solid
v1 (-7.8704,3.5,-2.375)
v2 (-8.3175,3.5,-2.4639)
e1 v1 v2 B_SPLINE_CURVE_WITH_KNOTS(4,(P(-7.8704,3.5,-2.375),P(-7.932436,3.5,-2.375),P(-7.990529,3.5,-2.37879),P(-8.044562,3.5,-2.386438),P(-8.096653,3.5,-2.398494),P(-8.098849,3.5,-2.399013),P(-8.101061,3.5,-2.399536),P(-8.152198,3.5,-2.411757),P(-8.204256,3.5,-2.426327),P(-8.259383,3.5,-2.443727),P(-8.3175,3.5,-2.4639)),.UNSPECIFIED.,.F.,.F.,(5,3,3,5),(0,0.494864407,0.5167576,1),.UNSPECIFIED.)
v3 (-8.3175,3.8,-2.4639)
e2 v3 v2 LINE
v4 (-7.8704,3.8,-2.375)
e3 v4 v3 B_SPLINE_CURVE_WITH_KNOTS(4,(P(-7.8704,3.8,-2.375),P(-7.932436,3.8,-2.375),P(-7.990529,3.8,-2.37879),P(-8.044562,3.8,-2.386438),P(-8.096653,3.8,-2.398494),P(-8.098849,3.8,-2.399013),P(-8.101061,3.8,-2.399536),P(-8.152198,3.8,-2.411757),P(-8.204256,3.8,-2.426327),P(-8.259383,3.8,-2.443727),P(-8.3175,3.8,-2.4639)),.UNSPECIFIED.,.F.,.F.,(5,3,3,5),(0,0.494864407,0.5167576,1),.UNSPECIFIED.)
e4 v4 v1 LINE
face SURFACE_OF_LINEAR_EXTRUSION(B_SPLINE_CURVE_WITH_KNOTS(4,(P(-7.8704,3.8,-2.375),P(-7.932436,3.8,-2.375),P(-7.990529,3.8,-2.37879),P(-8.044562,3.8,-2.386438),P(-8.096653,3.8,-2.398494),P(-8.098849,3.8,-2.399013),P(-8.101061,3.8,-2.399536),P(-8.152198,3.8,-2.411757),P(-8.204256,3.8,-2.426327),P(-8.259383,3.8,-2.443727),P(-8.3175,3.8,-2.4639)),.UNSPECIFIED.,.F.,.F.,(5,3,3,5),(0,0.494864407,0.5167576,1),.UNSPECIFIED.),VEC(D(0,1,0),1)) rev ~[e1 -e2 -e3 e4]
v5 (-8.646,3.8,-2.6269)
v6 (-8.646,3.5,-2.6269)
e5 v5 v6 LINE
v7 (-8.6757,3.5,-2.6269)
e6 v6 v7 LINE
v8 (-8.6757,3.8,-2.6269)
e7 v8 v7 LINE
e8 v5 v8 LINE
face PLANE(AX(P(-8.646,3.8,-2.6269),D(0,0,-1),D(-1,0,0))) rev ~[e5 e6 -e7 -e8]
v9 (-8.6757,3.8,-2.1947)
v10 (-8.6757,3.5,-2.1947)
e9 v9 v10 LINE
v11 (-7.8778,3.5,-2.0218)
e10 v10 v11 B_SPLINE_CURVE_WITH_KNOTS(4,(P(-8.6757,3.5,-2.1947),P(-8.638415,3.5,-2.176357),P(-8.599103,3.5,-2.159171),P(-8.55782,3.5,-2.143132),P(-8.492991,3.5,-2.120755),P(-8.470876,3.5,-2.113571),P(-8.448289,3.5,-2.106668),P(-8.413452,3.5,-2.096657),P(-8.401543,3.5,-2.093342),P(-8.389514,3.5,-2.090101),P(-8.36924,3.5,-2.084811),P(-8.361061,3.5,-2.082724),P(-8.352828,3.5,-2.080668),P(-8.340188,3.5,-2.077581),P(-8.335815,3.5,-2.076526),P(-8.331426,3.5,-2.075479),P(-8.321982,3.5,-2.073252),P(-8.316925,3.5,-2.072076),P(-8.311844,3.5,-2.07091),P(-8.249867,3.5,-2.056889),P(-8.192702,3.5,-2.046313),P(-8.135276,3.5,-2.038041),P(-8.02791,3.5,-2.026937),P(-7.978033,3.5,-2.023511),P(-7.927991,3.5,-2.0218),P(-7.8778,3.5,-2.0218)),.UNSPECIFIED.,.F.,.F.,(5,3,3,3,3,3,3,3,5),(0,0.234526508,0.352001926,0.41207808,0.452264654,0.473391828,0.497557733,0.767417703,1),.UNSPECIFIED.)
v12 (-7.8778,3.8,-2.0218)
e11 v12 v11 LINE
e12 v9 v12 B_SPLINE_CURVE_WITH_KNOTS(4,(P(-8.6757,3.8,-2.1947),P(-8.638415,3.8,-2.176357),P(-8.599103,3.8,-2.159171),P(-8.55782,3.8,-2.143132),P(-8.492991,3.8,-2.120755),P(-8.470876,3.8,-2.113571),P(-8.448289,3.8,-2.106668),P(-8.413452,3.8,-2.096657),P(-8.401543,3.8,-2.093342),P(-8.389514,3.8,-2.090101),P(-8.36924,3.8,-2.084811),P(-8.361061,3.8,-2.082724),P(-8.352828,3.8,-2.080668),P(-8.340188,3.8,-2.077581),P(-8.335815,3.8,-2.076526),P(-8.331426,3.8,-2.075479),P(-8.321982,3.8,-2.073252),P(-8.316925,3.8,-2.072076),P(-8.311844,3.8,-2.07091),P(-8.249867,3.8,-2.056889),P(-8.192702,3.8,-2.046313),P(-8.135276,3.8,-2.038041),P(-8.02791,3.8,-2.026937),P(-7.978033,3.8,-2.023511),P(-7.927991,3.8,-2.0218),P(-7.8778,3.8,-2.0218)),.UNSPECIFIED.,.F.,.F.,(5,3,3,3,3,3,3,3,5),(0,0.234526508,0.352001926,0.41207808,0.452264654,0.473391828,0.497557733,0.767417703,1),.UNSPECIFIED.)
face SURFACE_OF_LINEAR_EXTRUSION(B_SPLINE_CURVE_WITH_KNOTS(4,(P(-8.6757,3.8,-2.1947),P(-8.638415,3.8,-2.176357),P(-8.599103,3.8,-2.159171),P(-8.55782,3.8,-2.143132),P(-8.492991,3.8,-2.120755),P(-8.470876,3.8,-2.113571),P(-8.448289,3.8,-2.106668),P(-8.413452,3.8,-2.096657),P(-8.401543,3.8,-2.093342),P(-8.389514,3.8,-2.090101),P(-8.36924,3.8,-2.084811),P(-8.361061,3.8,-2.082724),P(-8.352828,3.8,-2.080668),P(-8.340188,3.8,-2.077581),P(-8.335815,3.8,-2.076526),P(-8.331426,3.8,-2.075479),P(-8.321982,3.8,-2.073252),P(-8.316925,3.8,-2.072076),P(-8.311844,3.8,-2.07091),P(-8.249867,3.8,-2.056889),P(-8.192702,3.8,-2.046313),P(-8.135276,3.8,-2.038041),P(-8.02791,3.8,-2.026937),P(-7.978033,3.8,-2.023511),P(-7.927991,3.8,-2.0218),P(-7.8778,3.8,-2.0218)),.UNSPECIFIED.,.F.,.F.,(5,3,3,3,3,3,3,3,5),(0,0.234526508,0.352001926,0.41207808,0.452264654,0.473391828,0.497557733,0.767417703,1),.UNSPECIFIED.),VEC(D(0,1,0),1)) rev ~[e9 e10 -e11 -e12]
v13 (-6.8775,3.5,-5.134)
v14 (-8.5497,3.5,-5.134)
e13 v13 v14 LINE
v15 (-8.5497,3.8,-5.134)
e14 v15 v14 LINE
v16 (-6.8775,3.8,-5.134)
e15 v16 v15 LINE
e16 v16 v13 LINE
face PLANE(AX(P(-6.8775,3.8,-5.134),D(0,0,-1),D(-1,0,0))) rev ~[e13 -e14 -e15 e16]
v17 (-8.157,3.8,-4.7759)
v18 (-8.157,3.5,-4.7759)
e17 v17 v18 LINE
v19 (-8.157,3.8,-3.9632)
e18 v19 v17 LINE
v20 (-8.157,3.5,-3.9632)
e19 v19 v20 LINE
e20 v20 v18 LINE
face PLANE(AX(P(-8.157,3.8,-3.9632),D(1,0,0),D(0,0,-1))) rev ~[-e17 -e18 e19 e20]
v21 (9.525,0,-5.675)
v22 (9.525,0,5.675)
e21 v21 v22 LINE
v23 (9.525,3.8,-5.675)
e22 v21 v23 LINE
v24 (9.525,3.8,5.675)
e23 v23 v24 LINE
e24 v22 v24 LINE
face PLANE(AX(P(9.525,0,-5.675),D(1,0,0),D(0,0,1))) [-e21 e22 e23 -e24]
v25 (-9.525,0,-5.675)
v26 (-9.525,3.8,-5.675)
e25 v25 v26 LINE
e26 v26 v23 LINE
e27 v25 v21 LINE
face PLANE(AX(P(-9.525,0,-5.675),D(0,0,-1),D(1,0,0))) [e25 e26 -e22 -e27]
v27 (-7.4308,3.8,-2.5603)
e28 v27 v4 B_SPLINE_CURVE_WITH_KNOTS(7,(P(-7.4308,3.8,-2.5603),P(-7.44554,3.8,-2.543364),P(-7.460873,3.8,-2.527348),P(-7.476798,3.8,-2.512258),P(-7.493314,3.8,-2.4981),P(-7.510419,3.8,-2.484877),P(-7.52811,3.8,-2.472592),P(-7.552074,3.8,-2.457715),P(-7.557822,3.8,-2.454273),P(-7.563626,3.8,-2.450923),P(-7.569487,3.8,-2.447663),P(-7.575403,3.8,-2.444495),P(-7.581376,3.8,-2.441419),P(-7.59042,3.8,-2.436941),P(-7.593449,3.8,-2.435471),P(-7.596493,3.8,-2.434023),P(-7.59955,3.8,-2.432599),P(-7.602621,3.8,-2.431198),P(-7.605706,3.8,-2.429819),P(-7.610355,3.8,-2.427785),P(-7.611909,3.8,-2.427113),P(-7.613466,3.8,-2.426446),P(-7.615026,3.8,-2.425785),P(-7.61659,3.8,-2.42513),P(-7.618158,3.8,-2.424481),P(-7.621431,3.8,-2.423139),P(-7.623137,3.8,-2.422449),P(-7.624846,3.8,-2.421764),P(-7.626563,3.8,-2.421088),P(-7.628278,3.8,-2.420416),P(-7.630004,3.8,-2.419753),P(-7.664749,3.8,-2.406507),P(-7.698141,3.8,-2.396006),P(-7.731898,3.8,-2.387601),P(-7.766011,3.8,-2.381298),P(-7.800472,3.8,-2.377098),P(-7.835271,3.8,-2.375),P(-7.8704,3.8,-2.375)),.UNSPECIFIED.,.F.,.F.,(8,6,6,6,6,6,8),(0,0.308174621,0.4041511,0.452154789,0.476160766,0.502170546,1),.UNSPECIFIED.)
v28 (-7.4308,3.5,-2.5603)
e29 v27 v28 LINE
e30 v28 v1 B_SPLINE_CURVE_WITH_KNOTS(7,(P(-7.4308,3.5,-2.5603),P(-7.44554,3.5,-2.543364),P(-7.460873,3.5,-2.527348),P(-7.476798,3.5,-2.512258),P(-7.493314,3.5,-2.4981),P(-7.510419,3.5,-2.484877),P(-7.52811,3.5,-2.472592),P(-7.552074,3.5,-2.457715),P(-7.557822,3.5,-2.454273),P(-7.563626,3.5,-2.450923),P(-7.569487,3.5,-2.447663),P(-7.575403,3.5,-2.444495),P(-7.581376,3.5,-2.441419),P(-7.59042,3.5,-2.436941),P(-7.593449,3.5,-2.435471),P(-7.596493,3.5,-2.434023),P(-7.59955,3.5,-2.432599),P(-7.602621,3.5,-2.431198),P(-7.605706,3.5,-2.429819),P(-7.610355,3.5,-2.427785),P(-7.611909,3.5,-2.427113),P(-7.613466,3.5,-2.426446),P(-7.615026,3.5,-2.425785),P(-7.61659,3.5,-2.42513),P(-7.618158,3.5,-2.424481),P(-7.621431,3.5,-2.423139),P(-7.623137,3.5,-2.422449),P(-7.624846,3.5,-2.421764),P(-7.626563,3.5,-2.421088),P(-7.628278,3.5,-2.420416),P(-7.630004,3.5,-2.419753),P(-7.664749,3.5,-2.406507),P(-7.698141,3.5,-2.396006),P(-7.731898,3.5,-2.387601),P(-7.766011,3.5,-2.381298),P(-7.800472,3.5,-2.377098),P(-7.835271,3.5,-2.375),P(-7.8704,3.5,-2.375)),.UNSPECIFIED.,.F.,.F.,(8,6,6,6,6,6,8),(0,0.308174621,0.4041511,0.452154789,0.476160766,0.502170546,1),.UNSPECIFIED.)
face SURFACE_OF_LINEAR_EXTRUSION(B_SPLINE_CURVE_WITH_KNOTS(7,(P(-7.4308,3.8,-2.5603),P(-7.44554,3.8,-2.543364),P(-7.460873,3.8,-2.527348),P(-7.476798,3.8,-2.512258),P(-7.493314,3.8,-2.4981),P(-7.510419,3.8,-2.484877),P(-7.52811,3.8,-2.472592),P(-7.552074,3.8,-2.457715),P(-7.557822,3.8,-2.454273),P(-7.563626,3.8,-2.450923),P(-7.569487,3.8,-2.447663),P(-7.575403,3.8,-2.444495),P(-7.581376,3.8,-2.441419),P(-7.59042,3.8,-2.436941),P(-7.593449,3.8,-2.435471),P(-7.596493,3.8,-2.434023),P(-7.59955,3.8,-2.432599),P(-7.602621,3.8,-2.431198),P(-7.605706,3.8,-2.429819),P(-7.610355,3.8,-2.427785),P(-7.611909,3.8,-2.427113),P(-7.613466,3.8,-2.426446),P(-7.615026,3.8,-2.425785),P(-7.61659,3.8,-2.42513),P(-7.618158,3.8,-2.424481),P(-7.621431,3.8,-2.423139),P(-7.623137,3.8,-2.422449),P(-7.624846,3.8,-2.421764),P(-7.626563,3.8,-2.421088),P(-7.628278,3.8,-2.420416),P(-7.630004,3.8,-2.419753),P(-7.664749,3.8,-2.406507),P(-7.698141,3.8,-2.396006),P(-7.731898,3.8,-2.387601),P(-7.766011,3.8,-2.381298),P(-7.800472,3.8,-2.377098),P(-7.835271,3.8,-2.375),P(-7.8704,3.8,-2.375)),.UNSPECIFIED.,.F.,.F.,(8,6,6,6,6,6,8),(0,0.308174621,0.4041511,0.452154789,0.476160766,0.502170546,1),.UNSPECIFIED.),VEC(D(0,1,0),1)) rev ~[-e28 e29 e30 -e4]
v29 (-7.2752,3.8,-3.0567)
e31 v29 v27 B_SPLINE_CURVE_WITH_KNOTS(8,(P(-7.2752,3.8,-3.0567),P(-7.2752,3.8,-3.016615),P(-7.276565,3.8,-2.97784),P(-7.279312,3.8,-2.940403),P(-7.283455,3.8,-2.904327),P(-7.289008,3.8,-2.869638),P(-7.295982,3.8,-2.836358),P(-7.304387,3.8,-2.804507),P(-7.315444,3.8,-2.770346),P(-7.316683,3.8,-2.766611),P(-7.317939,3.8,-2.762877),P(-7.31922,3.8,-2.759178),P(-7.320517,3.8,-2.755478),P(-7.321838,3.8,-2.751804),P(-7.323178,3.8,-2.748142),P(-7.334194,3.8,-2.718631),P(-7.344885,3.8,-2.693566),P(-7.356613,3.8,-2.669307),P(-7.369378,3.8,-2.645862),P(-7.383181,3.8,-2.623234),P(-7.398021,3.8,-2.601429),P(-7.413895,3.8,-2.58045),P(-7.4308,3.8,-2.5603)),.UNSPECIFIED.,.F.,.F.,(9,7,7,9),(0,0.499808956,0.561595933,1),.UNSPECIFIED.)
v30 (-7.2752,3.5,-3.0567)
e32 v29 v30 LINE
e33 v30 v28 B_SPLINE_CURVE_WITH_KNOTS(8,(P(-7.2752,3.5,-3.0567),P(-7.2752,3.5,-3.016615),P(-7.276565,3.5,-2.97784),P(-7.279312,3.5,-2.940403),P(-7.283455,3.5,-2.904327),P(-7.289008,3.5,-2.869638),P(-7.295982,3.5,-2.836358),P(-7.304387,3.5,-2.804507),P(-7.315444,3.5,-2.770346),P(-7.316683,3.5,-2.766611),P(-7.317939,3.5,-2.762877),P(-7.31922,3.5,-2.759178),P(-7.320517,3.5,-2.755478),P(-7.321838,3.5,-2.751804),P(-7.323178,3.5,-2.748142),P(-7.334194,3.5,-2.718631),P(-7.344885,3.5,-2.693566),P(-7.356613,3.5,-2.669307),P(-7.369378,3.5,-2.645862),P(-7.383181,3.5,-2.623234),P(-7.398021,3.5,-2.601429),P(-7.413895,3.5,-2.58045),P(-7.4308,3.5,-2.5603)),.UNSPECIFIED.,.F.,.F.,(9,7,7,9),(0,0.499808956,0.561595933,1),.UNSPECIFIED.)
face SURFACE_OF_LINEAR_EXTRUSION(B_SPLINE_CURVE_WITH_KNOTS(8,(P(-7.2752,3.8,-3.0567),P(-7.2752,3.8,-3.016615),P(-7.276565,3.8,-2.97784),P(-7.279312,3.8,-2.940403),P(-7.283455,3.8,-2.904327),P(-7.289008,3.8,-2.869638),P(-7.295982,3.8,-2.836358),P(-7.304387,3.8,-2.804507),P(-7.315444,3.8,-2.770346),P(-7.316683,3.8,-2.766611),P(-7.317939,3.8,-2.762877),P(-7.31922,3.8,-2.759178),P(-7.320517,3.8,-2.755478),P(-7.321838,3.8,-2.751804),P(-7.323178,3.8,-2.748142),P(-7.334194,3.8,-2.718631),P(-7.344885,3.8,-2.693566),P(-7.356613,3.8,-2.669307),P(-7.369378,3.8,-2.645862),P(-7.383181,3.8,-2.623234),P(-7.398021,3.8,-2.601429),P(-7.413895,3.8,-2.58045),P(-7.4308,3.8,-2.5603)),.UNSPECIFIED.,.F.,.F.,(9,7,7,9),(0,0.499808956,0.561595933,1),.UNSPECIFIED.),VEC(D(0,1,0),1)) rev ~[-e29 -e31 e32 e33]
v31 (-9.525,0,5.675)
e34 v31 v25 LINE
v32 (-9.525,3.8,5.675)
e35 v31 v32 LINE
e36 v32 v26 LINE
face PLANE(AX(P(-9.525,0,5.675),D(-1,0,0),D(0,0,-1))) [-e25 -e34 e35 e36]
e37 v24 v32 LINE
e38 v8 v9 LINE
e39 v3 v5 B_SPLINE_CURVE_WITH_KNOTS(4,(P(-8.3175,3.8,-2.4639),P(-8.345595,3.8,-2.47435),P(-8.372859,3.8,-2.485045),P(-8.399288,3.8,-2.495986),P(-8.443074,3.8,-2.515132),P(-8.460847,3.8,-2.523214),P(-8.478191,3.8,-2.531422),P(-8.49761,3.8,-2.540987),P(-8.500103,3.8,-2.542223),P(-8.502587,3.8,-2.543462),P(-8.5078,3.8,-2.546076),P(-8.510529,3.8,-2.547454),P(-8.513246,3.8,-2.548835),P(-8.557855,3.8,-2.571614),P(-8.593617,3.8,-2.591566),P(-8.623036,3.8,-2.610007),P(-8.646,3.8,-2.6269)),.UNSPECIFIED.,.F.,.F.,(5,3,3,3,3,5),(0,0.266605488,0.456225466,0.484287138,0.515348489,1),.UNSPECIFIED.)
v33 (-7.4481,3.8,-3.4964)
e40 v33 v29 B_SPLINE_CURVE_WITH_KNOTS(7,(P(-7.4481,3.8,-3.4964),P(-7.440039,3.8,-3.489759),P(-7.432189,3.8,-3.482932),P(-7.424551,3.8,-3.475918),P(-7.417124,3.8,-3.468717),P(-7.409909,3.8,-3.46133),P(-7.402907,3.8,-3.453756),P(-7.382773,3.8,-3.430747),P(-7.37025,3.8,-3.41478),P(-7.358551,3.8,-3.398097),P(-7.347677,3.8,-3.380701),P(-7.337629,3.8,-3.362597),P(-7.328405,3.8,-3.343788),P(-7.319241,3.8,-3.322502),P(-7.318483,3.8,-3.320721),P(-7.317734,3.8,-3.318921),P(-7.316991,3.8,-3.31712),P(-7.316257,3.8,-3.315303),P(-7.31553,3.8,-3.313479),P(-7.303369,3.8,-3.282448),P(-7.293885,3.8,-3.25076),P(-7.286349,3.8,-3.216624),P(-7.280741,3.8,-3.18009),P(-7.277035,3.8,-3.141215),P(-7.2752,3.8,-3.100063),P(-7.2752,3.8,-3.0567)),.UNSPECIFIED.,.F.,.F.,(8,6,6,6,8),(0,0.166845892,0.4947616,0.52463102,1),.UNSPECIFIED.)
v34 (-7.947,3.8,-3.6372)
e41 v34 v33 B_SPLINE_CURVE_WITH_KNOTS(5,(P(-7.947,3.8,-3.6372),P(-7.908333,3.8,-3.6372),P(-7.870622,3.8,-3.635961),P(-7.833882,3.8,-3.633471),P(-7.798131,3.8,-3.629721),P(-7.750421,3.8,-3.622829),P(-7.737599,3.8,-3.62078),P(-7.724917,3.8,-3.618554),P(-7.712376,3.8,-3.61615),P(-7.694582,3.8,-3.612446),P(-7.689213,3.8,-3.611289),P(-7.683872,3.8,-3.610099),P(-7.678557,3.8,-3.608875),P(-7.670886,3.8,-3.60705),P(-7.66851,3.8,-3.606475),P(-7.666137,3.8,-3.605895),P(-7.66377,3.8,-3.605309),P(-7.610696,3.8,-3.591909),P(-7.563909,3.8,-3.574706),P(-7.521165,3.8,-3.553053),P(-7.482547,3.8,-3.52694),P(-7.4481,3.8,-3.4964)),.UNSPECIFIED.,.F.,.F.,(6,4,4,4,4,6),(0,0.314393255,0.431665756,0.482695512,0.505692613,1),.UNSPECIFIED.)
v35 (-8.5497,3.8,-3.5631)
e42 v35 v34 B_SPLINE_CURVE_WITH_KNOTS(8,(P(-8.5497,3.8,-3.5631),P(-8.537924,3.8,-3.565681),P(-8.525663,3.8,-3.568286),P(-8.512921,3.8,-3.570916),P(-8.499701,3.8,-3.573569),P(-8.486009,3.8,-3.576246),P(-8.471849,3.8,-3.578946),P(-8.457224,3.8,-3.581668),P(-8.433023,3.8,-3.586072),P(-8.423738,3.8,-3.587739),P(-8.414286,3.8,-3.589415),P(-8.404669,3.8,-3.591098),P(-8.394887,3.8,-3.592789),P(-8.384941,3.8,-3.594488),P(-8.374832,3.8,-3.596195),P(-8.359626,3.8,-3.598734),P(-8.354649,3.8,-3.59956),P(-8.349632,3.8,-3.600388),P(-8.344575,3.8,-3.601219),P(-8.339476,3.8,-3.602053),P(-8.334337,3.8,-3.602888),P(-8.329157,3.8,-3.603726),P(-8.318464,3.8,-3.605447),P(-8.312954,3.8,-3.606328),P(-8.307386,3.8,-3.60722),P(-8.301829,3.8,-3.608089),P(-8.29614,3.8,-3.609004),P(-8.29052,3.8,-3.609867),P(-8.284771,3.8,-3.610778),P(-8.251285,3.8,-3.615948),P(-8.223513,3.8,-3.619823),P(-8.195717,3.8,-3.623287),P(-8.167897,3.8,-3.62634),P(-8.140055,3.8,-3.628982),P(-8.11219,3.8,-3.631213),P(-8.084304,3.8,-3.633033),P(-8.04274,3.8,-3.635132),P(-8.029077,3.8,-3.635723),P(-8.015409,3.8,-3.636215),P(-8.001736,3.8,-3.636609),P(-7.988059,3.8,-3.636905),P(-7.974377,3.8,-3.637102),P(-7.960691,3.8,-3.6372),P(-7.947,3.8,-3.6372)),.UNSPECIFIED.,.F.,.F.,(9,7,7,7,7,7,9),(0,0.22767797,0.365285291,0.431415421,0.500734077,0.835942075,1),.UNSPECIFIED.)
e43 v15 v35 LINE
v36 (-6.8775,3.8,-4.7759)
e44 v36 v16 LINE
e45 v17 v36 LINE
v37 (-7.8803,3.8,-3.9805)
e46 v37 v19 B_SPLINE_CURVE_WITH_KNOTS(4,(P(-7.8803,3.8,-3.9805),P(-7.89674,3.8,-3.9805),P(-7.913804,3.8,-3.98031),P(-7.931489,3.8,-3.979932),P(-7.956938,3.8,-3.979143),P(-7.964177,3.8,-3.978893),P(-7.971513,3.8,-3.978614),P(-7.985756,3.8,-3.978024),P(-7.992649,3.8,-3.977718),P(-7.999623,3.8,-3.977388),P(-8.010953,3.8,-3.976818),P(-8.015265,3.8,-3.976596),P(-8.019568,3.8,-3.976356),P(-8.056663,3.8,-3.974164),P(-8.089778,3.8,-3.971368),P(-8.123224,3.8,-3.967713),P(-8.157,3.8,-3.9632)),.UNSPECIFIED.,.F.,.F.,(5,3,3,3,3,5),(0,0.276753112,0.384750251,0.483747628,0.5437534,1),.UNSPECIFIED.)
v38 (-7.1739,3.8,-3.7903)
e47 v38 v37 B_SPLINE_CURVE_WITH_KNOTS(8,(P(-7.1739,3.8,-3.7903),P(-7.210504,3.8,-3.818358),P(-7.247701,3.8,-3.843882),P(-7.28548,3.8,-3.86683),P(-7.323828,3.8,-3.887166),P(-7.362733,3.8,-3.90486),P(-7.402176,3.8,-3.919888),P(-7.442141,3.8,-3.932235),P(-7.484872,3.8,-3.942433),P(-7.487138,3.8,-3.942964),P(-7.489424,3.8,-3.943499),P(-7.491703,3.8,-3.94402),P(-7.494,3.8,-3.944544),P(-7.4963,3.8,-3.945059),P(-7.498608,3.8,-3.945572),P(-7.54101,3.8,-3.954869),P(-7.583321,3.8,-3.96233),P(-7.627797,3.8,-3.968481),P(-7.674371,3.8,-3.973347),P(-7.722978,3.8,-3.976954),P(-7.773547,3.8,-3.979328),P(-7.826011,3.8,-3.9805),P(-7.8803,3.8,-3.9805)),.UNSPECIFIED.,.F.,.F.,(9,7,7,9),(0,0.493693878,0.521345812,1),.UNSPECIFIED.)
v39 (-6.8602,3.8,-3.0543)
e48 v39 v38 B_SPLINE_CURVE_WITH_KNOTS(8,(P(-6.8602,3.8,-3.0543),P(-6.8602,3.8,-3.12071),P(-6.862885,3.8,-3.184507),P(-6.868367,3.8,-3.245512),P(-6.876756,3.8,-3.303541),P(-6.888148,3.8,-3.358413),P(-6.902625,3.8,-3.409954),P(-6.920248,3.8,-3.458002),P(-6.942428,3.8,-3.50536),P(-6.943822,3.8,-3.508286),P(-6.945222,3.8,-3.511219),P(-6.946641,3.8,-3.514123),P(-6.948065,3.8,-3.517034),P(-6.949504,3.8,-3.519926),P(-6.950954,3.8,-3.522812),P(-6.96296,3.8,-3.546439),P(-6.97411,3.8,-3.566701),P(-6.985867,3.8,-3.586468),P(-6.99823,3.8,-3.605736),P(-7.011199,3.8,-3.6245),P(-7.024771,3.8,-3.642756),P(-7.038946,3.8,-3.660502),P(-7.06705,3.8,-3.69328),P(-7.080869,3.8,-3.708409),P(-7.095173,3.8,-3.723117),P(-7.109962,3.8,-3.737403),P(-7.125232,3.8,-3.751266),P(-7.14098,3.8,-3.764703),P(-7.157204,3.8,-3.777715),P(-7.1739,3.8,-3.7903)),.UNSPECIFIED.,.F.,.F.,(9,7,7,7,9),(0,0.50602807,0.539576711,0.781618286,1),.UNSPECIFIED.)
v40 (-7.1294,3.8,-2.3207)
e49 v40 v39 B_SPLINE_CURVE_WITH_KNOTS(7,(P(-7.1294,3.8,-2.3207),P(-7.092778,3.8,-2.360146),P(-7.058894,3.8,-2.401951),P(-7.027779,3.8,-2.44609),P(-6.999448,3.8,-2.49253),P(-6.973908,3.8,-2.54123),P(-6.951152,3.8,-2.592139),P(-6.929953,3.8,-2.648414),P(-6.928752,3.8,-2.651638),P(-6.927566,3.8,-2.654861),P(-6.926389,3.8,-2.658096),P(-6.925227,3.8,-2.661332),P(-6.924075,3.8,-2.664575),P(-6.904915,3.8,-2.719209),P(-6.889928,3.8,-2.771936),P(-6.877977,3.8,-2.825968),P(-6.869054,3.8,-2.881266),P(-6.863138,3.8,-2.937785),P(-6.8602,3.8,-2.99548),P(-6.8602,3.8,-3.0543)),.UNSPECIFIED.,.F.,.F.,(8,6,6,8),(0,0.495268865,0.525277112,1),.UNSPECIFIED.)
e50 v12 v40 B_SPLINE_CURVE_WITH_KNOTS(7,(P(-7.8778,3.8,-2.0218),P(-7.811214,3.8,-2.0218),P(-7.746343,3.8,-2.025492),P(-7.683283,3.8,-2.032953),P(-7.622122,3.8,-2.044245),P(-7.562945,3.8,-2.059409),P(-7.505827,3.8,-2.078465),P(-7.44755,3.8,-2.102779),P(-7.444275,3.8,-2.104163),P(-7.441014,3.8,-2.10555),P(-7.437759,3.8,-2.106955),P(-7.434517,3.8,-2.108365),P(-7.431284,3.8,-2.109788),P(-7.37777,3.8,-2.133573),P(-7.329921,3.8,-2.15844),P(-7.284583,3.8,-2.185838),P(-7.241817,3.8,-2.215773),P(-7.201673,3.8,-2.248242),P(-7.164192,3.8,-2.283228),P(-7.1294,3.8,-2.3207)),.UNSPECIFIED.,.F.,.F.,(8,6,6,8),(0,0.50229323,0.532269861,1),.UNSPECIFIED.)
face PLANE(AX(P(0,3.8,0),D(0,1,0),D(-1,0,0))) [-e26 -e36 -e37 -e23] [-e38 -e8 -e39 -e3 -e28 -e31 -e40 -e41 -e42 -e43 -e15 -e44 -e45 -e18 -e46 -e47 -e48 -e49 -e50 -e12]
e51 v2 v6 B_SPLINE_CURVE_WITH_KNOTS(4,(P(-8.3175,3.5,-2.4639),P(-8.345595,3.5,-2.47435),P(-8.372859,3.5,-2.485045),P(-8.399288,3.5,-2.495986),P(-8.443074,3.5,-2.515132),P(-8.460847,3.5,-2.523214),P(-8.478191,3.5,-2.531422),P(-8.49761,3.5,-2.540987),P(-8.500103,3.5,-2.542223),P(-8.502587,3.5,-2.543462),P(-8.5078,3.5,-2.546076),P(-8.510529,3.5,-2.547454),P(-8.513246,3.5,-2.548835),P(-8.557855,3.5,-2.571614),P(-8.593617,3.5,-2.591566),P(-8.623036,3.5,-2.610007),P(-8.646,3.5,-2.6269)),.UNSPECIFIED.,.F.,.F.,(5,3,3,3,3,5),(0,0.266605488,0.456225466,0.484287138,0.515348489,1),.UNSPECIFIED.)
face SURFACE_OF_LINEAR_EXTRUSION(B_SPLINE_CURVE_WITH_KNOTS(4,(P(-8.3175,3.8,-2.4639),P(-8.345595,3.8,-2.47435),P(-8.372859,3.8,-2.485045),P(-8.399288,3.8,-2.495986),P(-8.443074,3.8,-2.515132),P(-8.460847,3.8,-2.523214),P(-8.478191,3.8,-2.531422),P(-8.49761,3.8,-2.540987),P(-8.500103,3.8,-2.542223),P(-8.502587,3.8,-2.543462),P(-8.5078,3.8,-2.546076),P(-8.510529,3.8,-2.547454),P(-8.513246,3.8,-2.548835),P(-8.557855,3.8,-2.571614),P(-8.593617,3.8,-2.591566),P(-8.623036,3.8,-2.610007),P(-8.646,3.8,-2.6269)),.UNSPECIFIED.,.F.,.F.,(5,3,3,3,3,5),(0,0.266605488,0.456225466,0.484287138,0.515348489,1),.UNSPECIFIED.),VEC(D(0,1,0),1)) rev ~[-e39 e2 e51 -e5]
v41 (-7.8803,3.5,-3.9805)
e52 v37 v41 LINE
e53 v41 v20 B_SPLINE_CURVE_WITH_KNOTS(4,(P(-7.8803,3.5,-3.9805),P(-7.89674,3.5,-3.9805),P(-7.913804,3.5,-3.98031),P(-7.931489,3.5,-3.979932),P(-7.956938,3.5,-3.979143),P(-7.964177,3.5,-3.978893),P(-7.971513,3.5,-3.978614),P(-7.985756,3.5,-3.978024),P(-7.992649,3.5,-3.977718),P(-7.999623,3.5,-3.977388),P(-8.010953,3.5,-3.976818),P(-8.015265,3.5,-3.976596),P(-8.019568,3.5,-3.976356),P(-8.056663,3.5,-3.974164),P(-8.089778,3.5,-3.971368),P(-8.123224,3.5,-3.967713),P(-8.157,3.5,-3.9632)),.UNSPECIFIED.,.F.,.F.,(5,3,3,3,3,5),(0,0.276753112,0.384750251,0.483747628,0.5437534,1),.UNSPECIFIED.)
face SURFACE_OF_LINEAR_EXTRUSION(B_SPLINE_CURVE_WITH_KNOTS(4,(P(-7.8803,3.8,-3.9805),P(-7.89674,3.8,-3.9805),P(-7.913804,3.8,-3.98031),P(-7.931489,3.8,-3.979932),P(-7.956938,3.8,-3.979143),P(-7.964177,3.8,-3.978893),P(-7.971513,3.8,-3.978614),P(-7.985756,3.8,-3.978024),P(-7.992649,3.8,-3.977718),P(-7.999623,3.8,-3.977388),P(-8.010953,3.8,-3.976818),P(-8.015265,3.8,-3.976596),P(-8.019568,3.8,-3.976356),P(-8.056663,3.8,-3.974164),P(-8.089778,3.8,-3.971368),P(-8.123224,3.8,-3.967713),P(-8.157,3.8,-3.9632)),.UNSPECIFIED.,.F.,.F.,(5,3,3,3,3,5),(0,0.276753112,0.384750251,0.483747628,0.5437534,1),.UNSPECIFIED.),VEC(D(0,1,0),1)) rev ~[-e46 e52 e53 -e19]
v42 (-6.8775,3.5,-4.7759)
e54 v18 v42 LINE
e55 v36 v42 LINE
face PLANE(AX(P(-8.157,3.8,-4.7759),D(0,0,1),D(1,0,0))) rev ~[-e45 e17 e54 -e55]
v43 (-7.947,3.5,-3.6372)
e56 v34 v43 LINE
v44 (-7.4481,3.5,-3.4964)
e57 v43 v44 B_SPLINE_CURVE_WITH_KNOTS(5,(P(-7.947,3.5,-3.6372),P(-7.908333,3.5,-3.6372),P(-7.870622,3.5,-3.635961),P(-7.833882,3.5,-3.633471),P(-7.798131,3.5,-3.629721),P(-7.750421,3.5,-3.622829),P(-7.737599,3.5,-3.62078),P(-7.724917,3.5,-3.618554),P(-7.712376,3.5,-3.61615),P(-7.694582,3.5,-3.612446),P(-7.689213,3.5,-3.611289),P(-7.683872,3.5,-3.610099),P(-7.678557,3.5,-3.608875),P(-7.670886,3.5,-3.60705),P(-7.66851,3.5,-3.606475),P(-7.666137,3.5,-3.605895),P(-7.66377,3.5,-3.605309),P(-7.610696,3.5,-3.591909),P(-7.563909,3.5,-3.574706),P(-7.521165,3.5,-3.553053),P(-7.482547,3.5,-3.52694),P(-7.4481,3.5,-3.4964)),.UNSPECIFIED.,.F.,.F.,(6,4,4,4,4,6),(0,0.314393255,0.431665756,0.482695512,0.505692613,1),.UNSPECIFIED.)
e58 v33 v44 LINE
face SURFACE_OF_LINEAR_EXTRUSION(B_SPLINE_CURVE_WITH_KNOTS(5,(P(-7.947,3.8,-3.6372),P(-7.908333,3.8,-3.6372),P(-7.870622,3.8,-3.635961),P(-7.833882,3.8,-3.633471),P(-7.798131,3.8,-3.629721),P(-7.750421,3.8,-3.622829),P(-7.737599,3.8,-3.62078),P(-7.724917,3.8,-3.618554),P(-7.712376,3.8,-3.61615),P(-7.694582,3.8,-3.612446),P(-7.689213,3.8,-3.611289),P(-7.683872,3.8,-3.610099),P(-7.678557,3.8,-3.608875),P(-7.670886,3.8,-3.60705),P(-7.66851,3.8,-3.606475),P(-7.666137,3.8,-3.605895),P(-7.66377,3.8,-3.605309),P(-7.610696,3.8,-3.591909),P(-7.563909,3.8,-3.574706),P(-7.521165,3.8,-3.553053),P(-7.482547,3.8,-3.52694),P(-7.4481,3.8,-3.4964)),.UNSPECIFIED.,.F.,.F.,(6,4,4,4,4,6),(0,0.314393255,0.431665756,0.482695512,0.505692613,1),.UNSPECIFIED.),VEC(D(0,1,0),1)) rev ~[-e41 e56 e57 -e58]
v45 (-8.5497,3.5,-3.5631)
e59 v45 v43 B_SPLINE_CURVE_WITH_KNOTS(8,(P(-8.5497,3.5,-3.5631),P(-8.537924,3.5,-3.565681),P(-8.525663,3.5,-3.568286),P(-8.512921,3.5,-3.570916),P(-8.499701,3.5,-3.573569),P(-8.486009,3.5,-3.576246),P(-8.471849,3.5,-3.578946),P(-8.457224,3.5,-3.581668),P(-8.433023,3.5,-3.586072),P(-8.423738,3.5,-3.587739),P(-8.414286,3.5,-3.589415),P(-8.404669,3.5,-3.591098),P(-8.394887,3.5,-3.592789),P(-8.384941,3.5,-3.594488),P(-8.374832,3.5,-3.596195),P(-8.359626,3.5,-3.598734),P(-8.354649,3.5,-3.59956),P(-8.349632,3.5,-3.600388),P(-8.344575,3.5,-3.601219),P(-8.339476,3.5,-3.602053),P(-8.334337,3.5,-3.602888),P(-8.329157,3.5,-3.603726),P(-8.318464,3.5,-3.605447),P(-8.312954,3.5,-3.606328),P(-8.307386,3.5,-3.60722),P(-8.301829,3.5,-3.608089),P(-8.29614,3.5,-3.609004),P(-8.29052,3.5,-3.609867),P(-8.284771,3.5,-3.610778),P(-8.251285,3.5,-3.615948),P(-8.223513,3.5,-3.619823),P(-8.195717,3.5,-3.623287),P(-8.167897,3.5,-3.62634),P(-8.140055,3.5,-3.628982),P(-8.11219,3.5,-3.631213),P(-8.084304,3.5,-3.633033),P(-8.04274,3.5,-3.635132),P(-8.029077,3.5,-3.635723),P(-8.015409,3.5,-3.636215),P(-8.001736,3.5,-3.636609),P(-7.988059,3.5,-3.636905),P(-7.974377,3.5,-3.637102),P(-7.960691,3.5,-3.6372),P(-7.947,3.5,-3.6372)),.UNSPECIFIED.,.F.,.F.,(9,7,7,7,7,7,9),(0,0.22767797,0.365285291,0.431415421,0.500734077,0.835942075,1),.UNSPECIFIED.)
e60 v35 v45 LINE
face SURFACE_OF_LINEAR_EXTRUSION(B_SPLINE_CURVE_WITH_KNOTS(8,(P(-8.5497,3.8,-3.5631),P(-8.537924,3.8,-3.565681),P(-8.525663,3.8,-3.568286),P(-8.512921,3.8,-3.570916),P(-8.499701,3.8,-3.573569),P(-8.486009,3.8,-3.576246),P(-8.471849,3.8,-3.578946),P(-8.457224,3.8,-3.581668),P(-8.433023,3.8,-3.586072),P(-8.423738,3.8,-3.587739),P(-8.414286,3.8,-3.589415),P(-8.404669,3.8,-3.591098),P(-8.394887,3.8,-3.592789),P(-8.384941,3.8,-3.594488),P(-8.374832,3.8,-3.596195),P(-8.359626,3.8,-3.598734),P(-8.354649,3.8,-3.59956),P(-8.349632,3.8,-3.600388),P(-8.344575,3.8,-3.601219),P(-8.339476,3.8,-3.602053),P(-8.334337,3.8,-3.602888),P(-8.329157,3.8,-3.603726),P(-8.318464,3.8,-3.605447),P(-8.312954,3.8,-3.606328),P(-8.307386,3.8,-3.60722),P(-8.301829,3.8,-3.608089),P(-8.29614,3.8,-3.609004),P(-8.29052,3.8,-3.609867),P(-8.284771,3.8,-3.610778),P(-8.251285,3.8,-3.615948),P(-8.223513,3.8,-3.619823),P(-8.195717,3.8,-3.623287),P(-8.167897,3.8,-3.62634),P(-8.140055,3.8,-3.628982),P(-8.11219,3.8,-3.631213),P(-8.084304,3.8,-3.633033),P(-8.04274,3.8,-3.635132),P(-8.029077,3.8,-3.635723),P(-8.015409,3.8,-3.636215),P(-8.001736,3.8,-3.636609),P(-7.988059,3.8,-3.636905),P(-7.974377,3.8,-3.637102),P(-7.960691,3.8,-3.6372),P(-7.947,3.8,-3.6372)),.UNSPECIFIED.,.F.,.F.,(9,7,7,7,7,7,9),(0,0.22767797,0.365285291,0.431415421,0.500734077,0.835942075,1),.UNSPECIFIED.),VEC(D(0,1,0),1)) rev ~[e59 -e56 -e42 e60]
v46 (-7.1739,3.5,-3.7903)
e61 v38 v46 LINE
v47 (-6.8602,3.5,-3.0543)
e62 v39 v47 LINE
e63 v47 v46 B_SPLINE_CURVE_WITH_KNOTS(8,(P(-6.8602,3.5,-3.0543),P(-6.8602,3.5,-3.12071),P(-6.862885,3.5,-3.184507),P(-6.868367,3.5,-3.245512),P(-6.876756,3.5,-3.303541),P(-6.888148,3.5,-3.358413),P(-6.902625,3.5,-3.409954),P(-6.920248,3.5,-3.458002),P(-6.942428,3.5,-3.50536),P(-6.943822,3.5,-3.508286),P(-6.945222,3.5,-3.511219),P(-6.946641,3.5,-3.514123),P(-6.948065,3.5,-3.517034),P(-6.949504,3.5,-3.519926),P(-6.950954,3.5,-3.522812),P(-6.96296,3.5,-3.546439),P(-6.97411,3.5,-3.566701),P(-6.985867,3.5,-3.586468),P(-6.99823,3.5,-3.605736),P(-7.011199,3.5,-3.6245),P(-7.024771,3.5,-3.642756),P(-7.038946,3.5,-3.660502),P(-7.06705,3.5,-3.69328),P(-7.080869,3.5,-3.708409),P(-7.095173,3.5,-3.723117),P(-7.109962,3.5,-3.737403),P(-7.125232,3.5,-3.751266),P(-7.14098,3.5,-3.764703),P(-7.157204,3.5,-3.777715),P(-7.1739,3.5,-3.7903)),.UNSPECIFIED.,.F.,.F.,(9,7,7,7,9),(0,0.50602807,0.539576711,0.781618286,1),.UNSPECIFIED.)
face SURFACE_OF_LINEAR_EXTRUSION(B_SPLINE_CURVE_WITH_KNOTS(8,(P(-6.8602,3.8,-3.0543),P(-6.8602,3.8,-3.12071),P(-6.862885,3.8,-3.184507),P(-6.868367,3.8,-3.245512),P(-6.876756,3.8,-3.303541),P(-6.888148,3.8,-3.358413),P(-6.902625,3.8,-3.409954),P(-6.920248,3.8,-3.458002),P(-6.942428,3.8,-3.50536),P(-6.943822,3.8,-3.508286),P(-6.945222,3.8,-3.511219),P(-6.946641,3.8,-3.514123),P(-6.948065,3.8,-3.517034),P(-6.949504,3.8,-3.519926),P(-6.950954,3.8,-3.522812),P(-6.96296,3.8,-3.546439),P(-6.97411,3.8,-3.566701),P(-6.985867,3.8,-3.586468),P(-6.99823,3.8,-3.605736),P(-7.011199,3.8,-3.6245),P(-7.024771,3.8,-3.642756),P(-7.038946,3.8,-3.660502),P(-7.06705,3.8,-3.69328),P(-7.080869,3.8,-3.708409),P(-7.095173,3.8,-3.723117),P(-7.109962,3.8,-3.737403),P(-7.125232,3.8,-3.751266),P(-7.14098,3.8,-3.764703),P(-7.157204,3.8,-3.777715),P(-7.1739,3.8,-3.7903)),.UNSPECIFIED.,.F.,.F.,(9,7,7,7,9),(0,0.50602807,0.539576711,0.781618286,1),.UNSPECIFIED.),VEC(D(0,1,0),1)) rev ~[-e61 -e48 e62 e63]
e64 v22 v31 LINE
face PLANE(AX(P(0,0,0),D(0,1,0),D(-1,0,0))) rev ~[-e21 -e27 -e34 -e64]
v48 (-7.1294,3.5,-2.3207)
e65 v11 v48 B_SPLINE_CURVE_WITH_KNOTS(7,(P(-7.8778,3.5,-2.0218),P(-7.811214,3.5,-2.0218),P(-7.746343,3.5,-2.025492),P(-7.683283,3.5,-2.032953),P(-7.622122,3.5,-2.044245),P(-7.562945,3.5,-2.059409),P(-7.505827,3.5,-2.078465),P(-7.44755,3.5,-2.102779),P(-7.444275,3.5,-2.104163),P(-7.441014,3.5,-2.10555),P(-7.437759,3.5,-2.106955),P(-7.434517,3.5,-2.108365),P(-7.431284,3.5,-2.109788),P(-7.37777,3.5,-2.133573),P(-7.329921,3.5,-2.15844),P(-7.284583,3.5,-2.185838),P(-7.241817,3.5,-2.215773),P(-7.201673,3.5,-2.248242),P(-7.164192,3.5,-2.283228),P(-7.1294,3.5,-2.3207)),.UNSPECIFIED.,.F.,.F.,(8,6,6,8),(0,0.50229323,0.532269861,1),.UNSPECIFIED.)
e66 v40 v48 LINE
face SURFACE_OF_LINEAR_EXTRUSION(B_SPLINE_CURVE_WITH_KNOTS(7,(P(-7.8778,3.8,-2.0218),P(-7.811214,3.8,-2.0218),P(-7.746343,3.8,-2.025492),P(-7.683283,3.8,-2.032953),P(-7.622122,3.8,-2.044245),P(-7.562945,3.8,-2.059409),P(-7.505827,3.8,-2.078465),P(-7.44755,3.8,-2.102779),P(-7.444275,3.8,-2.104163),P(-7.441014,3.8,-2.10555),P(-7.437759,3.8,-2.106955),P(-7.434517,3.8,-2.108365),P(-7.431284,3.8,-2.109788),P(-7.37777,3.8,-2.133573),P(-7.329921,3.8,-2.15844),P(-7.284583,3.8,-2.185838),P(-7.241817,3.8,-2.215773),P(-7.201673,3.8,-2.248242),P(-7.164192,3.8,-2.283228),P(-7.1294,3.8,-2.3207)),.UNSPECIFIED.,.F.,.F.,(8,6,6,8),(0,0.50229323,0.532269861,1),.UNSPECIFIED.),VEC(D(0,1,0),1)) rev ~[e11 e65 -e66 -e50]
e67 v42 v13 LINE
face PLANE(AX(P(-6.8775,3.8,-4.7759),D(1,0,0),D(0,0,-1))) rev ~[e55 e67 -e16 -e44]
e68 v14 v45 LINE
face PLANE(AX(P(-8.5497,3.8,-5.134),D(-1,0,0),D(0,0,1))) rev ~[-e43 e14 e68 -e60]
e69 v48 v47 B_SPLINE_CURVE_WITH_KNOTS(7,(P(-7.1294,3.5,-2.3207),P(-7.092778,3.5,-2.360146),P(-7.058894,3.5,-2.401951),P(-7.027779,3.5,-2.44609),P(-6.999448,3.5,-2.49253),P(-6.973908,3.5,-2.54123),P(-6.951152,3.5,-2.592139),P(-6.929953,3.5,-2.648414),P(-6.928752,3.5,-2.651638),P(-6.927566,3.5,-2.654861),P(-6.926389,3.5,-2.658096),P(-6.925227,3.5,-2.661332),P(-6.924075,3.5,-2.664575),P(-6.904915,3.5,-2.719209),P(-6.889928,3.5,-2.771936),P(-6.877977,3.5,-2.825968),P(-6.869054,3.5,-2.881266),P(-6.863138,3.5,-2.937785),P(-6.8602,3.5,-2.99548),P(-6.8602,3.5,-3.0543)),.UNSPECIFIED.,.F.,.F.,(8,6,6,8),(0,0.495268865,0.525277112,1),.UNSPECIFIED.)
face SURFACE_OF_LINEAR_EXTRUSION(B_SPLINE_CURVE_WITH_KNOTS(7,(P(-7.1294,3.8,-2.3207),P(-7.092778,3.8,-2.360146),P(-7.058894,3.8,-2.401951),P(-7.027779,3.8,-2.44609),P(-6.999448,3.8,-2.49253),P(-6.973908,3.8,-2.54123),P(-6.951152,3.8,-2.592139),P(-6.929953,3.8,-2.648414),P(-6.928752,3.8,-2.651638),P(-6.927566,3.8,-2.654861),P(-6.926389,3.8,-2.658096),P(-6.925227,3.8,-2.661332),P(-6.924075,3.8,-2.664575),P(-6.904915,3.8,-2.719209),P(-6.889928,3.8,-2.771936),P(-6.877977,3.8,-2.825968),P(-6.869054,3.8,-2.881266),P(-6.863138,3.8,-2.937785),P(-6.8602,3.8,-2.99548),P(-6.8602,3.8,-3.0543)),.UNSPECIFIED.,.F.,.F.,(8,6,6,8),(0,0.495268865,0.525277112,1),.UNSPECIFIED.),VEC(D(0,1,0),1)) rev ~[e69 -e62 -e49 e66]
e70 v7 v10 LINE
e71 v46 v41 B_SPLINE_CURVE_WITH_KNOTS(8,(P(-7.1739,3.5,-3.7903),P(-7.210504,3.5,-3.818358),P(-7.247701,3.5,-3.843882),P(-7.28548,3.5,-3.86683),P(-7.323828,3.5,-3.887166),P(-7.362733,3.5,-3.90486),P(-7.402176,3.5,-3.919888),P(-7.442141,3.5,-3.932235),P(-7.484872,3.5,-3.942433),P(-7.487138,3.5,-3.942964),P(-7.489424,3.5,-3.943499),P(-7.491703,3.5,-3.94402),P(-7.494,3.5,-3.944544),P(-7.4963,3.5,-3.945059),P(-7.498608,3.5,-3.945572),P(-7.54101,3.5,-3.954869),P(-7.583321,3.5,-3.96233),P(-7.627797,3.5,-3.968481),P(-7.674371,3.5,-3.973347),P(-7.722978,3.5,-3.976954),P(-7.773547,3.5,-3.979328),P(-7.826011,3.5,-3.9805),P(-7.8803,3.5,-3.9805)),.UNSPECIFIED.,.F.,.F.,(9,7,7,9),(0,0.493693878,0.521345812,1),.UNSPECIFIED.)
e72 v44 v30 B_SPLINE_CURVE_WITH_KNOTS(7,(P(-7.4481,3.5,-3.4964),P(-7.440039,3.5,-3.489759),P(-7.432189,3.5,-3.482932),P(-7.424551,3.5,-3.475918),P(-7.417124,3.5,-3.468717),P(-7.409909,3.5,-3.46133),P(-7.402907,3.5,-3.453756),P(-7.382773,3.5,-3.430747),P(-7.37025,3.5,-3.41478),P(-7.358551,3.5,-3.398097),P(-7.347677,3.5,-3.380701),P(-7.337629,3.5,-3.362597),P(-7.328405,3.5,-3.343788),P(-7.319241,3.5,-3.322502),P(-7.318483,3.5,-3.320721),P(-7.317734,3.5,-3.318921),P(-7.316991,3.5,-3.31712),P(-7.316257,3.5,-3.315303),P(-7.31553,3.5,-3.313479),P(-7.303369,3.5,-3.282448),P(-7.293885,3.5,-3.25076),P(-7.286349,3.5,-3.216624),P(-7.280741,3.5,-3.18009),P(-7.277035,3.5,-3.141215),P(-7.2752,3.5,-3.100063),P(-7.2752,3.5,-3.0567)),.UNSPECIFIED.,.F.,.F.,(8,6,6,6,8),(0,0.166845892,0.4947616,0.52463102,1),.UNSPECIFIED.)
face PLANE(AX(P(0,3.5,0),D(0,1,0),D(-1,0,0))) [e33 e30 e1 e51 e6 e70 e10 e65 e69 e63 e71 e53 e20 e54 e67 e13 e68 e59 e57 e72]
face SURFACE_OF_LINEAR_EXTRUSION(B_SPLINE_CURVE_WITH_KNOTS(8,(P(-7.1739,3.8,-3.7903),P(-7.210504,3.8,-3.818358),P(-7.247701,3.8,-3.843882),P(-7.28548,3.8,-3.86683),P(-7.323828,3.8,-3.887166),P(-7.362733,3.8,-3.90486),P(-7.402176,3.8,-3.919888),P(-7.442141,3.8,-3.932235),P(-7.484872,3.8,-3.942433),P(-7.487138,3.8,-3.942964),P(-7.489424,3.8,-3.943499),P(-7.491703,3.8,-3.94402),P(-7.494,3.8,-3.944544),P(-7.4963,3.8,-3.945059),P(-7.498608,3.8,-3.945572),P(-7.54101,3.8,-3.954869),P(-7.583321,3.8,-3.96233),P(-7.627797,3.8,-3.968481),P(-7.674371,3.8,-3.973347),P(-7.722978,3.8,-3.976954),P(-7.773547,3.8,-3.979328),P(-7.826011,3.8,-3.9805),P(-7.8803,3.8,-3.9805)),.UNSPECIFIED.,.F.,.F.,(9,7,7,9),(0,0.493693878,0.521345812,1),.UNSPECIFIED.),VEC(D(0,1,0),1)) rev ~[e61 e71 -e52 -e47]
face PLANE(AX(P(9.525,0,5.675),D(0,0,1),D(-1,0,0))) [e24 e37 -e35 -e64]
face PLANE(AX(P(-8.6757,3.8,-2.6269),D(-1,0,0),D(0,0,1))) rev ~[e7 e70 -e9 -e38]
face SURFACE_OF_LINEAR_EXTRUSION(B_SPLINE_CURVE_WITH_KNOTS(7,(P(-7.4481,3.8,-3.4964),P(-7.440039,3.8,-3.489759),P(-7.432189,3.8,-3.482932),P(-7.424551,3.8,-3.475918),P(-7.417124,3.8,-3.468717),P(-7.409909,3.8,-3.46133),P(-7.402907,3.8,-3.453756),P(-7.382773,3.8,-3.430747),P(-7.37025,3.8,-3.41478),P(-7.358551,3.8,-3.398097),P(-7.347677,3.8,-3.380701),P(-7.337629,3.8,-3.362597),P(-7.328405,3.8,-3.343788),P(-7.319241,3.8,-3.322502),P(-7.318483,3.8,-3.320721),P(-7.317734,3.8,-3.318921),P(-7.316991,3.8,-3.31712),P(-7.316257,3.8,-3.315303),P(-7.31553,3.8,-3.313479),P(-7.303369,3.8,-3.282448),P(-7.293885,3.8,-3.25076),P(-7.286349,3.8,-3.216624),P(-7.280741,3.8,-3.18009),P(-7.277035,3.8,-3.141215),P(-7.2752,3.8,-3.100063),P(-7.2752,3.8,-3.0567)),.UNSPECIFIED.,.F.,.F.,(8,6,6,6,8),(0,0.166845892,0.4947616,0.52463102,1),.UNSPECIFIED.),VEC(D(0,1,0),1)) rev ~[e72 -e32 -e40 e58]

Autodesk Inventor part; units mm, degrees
ref_plane "YZ Plane" through (0, 0, 0) normal (1, 0, 0) x (0, 1, 0)
ref_plane "XZ Plane" through (0, 0, 0) normal (0, 1, 0) x (-1, 0, 0)
ref_plane "XY Plane" through (0, 0, 0) normal (0, 0, 1) x (1, 0, 0)
sketch "Sketch1" plane through (0, 0, 0) normal (0, 1, 0) x (-1, 0, 0)
  line L0 (9.525, -5.675) -> (-9.525, -5.675)
  line L1 (-9.525, -5.675) -> (-9.525, 5.675)
  line L2 (-9.525, 5.675) -> (9.525, 5.675)
  line L3 (9.525, 5.675) -> (9.525, -5.675)
  point P0 (0, 0)
  point P1 (0, 0)
  dimension "d0" = 19.05
  dimension "d1" = 11.35
extrude "Extrusion1" add sketch "Sketch1" along normal blind 3.8
sketch "Sketch2" plane through (0, 3.8, 0) normal (0, 1, 0) x (1, 0, 0)
  line L0 (-8.9301, 5.134) -> (-6.6428, 5.134) construction
  line L1 (-6.6428, 5.134) -> (-6.6428, 2.0218) construction
  line L2 (-6.6428, 2.0218) -> (-8.9301, 2.0218) construction
  line L3 (-8.9301, 2.0218) -> (-8.9301, 5.134) construction
  spline S0 degree 2 poles (-6.8602, 3.0543) (-6.8602, 2.8344) (-7.001, 2.459) (-7.1294, 2.3207) knots 0 0 0 1 2 2 2
  spline S1 degree 2 poles (-7.1294, 2.3207) (-7.2579, 2.1823) (-7.6407, 2.0218) (-7.8778, 2.0218) knots 0 0 0 1 2 2 2
  spline S2 degree 2 poles (-7.8778, 2.0218) (-8.0952, 2.0218) (-8.52, 2.1181) (-8.6757, 2.1947) knots 0 0 0 1 2 2 2
  line L4 (-8.6757, 2.1947) -> (-8.6757, 2.6269)
  line L5 (-8.6757, 2.6269) -> (-8.646, 2.6269)
  spline S3 degree 2 poles (-8.646, 2.6269) (-8.5991, 2.5924) (-8.4237, 2.5034) (-8.3175, 2.4639) knots 0 0 0 1 2 2 2
  spline S4 degree 2 poles (-8.3175, 2.4639) (-8.1965, 2.4219) (-7.9964, 2.375) (-7.8704, 2.375) knots 0 0 0 1 2 2 2
  spline S5 degree 2 poles (-7.8704, 2.375) (-7.7469, 2.375) (-7.5147, 2.4639) (-7.4308, 2.5603) knots 0 0 0 1 2 2 2
  spline S6 degree 2 poles (-7.4308, 2.5603) (-7.3542, 2.6516) (-7.2752, 2.8937) (-7.2752, 3.0567) knots 0 0 0 1 2 2 2
  spline S7 degree 2 poles (-7.2752, 3.0567) (-7.2752, 3.2197) (-7.3641, 3.4272) (-7.4481, 3.4964) knots 0 0 0 1 2 2 2
  spline S8 degree 2 poles (-7.4481, 3.4964) (-7.5345, 3.573) (-7.7914, 3.6372) (-7.947, 3.6372) knots 0 0 0 1 2 2 2
  spline S9 degree 2 poles (-7.947, 3.6372) (-8.115, 3.6372) (-8.4484, 3.5853) (-8.5497, 3.5631) knots 0 0 0 1 2 2 2
  line L6 (-8.5497, 3.5631) -> (-8.5497, 5.134)
  line L7 (-8.5497, 5.134) -> (-6.8775, 5.134)
  line L8 (-6.8775, 5.134) -> (-6.8775, 4.7759)
  line L9 (-6.8775, 4.7759) -> (-8.157, 4.7759)
  line L10 (-8.157, 4.7759) -> (-8.157, 3.9632)
  spline S10 degree 2 poles (-8.157, 3.9632) (-8.0829, 3.9731) (-7.9396, 3.9805) (-7.8803, 3.9805) knots 0 0 0 1 2 2 2
  spline S11 degree 2 poles (-7.8803, 3.9805) (-7.6457, 3.9805) (-7.3221, 3.9039) (-7.1739, 3.7903) knots 0 0 0 1 2 2 2
  spline S12 degree 2 poles (-7.1739, 3.7903) (-7.0232, 3.6767) (-6.8602, 3.3309) (-6.8602, 3.0543) knots 0 0 0 1 2 2 2
  point P0 (0, 0)
emboss "Emboss1" sketch "Sketch2" operation cut depth 0.3 direction (0, -1, 0)
properties part number "5gram weight"
